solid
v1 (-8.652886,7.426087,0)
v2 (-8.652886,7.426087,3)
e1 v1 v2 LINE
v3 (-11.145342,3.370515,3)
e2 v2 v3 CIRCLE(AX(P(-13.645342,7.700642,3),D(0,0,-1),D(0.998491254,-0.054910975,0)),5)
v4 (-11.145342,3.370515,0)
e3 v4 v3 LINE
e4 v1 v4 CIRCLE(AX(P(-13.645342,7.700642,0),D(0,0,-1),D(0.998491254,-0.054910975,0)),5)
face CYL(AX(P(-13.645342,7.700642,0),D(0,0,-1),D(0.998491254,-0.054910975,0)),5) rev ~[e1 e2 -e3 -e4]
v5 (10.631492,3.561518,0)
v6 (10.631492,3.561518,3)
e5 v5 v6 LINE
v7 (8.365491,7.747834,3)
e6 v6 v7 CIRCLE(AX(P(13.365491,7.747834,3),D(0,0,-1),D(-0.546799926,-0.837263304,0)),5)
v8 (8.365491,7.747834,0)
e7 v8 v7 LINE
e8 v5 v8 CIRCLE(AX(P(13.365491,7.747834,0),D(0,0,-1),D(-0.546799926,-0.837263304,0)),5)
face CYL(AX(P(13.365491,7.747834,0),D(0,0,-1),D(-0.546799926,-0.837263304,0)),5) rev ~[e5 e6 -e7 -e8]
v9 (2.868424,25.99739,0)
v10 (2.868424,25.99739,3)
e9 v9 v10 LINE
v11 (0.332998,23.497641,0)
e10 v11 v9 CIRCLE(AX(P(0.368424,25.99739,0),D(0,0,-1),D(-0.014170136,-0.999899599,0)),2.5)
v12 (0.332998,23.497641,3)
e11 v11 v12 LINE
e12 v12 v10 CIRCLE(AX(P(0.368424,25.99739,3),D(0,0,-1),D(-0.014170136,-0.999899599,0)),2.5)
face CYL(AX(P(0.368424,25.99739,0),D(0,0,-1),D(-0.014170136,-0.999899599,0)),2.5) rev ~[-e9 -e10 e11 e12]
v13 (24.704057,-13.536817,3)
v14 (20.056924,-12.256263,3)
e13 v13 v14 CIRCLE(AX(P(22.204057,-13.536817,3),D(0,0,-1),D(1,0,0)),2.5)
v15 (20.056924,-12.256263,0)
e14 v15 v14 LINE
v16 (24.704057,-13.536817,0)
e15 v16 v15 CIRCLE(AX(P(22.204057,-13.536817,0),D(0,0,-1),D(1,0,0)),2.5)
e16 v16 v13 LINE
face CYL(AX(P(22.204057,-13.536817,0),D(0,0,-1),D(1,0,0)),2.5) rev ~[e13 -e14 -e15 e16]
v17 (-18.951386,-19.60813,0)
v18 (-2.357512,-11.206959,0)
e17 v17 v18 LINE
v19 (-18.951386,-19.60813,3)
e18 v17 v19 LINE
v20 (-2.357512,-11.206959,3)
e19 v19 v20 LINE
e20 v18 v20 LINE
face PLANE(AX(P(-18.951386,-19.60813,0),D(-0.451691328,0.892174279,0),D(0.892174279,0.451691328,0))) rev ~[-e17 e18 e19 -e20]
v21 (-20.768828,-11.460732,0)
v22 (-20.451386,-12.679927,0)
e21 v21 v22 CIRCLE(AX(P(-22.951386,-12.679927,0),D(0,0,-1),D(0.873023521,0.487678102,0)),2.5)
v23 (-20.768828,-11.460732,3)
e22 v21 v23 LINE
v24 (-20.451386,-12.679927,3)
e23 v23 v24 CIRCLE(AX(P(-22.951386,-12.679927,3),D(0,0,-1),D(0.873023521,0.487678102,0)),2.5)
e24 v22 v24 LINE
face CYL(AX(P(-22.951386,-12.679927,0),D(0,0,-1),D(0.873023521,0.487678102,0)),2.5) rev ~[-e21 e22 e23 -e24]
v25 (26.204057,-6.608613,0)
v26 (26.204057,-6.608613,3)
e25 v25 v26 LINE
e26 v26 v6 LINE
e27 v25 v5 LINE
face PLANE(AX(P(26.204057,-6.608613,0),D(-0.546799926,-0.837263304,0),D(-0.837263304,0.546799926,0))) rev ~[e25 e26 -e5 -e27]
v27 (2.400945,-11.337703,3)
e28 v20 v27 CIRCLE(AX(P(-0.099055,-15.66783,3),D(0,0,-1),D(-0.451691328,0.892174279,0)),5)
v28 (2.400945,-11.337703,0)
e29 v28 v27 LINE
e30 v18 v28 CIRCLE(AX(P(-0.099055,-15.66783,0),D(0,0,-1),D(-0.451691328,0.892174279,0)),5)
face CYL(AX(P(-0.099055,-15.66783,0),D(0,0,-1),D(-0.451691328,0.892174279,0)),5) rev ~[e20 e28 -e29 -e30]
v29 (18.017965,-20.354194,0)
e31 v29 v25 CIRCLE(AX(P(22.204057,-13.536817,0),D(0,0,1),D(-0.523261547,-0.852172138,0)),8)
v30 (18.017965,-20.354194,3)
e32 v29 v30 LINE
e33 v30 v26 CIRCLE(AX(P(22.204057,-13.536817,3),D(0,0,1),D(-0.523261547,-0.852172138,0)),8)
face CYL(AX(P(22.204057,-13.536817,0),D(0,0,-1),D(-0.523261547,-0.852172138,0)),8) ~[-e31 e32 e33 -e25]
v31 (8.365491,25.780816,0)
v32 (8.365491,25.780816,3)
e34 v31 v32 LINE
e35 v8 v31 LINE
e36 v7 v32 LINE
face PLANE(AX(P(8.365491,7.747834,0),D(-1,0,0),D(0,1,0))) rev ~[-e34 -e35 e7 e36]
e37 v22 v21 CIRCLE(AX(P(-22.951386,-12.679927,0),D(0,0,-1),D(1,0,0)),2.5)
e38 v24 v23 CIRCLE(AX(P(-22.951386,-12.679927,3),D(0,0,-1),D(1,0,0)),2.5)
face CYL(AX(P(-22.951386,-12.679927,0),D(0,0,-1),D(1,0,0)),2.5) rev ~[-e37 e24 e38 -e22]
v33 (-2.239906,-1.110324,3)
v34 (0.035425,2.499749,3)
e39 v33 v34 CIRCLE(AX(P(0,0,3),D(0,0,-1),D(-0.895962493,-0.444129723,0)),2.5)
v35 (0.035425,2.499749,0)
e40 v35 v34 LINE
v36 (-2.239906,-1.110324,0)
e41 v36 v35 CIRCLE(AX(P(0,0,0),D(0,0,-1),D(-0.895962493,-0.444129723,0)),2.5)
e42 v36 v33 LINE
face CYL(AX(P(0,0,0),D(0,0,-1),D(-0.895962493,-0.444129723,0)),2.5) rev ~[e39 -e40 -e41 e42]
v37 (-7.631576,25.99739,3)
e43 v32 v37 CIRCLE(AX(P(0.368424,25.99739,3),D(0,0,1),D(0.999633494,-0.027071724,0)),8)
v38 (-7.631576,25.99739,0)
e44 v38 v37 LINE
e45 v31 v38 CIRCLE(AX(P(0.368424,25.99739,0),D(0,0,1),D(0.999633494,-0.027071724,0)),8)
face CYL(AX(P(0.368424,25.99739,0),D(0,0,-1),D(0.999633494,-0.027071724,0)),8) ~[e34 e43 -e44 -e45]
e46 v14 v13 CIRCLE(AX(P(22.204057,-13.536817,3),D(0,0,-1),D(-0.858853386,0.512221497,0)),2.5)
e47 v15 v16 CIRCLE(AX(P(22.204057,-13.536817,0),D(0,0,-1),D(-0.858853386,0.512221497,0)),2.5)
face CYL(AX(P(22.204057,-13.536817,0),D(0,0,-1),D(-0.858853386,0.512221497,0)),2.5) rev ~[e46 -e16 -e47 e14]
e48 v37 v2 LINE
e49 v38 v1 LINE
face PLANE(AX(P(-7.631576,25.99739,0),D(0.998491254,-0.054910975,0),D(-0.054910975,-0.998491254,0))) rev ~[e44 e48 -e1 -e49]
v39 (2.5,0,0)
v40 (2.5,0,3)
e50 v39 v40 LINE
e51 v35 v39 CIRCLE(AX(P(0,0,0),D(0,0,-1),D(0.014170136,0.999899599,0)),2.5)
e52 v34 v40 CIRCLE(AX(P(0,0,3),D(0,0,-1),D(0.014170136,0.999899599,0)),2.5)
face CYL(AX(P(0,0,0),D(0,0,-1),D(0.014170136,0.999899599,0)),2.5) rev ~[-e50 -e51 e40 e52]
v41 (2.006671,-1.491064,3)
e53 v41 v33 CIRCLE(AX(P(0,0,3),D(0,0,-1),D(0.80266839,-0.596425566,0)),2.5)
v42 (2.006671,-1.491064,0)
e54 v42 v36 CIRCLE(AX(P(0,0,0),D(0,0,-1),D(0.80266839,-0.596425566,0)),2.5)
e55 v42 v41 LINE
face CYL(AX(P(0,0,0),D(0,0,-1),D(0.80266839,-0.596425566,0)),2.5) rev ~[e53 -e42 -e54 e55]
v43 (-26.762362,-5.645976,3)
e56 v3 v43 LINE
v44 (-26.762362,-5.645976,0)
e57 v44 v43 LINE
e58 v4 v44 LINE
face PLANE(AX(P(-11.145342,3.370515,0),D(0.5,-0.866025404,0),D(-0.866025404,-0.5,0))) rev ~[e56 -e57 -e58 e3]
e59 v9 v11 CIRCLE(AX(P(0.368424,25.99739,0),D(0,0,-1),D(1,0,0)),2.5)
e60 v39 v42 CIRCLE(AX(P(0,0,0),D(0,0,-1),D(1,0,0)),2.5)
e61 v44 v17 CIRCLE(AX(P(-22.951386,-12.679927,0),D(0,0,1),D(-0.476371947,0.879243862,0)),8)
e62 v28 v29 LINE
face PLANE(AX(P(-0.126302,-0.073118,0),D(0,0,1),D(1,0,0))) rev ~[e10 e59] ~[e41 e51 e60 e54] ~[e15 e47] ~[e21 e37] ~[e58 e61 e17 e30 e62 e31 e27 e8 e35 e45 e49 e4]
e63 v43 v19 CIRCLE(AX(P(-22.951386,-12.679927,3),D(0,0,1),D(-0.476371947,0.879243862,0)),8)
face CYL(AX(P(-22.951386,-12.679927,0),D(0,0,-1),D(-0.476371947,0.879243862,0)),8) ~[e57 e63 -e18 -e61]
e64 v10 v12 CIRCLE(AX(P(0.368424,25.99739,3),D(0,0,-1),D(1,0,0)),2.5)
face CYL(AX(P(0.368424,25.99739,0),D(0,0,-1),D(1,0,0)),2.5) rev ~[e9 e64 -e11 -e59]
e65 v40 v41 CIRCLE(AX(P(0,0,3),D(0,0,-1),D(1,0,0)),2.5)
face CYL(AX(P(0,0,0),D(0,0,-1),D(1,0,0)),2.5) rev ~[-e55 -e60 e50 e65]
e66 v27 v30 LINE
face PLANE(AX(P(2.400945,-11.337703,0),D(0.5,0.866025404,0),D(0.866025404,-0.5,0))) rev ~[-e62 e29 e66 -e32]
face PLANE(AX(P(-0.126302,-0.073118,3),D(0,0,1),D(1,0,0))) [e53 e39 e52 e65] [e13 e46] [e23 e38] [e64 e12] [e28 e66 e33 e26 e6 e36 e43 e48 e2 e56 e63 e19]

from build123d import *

# Parameters (mm, degrees)
F1_DEPTH = 3


# Not quite as in the source:
# - a feature names something its author has since deleted; it is built from what else it names


with BuildPart() as f1:
    # F0 (on Top) → F1 (new body)
    with BuildSketch(Plane.XY):
        with BuildLine():
            Line((8.3654914829, 7.7478343503), (8.3654914829, 25.7808157751))
            ThreePointArc((8.3654914829, 25.7808157751), (0.4767203504, 33.9966565171), (-7.631576467, 25.9973895632))
            Line((-7.631576467, 25.9973895632), (-8.6528857034, 7.4260866897))
            ThreePointArc((-8.6528857034, 7.4260866897), (-9.3855131516, 5.0826540918), (-11.1453419747, 3.3705145438))
            Line((-11.1453419747, 3.3705145438), (-26.7623619946, -5.6459761686))
            ThreePointArc((-26.7623619946, -5.6459761686), (-29.9331032244, -16.585772745), (-18.951386422, -19.6081302933))
            Line((-18.951386422, -19.6081302933), (-2.3575117339, -11.2069586004))
            ThreePointArc((-2.3575117339, -11.2069586004), (0.038274152, -10.6697162831), (2.400944907, -11.3377029763))
            Line((2.400944907, -11.3377029763), (18.0179649268, -20.3541936886))
            ThreePointArc((18.0179649268, -20.3541936886), (29.0774772891, -17.6302378543), (26.2040573041, -6.6086133521))
            Line((26.2040573041, -6.6086133521), (10.6314918524, 3.5615178285))
            ThreePointArc((10.6314918524, 3.5615178285), (8.9683334147, 5.3677081091), (8.3654914829, 7.7478343503))
        make_face()
        with BuildLine():
            ThreePointArc((-20.451386422, -12.679927063), (-25.3707248656, -13.3098488797), (-20.7688276181, -11.4607318089))
            ThreePointArc((-20.7688276181, -11.4607318089), (-20.5320479783, -12.0500052463), (-20.451386422, -12.679927063))
        make_face(mode=Mode.SUBTRACT)
        with BuildLine():
            ThreePointArc((24.7040573041, -13.5368165824), (21.5399163779, -15.9469860432), (20.0569238399, -12.25626284))
            ThreePointArc((20.0569238399, -12.25626284), (22.8681982302, -11.1266471215), (24.7040573041, -13.5368165824))
        make_face(mode=Mode.SUBTRACT)
        with BuildLine():
            ThreePointArc((-7.9164689421, -4.2812988086), (-7.6979940139, 4.6627125327), (0.127531223, 8.9990963873))
            ThreePointArc((0.127531223, 8.9990963873), (6.4088915191, 6.3187110629), (9, 0))
            ThreePointArc((9, 0), (8.6421794957, -2.5125153857), (7.5971703192, -4.8252464332))
            ThreePointArc((7.5971703192, -4.8252464332), (-0.315369081, -8.9944728774), (-7.9164689421, -4.2812988086))
        make_face(mode=Mode.SUBTRACT)
        with BuildLine():
            ThreePointArc((2.868423533, 25.9973895632), (2.1236210505, 24.217141919), (0.3329981933, 23.4976405667))
            ThreePointArc((0.3329981933, 23.4976405667), (-1.3867739845, 27.7776372074), (2.868423533, 25.9973895632))
        make_face(mode=Mode.SUBTRACT)
        with BuildLine():
            ThreePointArc((0.0354253397, 2.4997489965), (1.7802476442, 1.7551975175), (2.5, 0))
            ThreePointArc((2.5, 0), (2.3734655501, -0.7852778377), (2.0066709741, -1.4910639161))
            Line((2.0066709741, -1.4910639161), (7.5971703192, -4.8252464332))
            ThreePointArc((7.5971703192, -4.8252464332), (8.6421794957, -2.5125153857), (9, 0))
            ThreePointArc((9, 0), (6.4088915191, 6.3187110629), (0.127531223, 8.9990963873))
            Line((0.127531223, 8.9990963873), (0.0354253397, 2.4997489965))
        make_face()
        with BuildLine():
            ThreePointArc((-2.239906233, -1.1103243073), (-2.1149683962, 1.333007383), (0.0354253397, 2.4997489965))
            Line((0.0354253397, 2.4997489965), (0.127531223, 8.9990963873))
            ThreePointArc((0.127531223, 8.9990963873), (-7.6979940139, 4.6627125327), (-7.9164689421, -4.2812988086))
            Line((-7.9164689421, -4.2812988086), (-2.239906233, -1.1103243073))
        make_face()
        with BuildLine():
            Line((7.5971703192, -4.8252464332), (2.0066709741, -1.4910639161))
            ThreePointArc((2.0066709741, -1.4910639161), (-0.2232494881, -2.4900119811), (-2.239906233, -1.1103243073))
            Line((-2.239906233, -1.1103243073), (-7.9164689421, -4.2812988086))
            ThreePointArc((-7.9164689421, -4.2812988086), (-0.315369081, -8.9944728774), (7.5971703192, -4.8252464332))
        make_face()
    extrude(amount=F1_DEPTH)


solid = f1.part
